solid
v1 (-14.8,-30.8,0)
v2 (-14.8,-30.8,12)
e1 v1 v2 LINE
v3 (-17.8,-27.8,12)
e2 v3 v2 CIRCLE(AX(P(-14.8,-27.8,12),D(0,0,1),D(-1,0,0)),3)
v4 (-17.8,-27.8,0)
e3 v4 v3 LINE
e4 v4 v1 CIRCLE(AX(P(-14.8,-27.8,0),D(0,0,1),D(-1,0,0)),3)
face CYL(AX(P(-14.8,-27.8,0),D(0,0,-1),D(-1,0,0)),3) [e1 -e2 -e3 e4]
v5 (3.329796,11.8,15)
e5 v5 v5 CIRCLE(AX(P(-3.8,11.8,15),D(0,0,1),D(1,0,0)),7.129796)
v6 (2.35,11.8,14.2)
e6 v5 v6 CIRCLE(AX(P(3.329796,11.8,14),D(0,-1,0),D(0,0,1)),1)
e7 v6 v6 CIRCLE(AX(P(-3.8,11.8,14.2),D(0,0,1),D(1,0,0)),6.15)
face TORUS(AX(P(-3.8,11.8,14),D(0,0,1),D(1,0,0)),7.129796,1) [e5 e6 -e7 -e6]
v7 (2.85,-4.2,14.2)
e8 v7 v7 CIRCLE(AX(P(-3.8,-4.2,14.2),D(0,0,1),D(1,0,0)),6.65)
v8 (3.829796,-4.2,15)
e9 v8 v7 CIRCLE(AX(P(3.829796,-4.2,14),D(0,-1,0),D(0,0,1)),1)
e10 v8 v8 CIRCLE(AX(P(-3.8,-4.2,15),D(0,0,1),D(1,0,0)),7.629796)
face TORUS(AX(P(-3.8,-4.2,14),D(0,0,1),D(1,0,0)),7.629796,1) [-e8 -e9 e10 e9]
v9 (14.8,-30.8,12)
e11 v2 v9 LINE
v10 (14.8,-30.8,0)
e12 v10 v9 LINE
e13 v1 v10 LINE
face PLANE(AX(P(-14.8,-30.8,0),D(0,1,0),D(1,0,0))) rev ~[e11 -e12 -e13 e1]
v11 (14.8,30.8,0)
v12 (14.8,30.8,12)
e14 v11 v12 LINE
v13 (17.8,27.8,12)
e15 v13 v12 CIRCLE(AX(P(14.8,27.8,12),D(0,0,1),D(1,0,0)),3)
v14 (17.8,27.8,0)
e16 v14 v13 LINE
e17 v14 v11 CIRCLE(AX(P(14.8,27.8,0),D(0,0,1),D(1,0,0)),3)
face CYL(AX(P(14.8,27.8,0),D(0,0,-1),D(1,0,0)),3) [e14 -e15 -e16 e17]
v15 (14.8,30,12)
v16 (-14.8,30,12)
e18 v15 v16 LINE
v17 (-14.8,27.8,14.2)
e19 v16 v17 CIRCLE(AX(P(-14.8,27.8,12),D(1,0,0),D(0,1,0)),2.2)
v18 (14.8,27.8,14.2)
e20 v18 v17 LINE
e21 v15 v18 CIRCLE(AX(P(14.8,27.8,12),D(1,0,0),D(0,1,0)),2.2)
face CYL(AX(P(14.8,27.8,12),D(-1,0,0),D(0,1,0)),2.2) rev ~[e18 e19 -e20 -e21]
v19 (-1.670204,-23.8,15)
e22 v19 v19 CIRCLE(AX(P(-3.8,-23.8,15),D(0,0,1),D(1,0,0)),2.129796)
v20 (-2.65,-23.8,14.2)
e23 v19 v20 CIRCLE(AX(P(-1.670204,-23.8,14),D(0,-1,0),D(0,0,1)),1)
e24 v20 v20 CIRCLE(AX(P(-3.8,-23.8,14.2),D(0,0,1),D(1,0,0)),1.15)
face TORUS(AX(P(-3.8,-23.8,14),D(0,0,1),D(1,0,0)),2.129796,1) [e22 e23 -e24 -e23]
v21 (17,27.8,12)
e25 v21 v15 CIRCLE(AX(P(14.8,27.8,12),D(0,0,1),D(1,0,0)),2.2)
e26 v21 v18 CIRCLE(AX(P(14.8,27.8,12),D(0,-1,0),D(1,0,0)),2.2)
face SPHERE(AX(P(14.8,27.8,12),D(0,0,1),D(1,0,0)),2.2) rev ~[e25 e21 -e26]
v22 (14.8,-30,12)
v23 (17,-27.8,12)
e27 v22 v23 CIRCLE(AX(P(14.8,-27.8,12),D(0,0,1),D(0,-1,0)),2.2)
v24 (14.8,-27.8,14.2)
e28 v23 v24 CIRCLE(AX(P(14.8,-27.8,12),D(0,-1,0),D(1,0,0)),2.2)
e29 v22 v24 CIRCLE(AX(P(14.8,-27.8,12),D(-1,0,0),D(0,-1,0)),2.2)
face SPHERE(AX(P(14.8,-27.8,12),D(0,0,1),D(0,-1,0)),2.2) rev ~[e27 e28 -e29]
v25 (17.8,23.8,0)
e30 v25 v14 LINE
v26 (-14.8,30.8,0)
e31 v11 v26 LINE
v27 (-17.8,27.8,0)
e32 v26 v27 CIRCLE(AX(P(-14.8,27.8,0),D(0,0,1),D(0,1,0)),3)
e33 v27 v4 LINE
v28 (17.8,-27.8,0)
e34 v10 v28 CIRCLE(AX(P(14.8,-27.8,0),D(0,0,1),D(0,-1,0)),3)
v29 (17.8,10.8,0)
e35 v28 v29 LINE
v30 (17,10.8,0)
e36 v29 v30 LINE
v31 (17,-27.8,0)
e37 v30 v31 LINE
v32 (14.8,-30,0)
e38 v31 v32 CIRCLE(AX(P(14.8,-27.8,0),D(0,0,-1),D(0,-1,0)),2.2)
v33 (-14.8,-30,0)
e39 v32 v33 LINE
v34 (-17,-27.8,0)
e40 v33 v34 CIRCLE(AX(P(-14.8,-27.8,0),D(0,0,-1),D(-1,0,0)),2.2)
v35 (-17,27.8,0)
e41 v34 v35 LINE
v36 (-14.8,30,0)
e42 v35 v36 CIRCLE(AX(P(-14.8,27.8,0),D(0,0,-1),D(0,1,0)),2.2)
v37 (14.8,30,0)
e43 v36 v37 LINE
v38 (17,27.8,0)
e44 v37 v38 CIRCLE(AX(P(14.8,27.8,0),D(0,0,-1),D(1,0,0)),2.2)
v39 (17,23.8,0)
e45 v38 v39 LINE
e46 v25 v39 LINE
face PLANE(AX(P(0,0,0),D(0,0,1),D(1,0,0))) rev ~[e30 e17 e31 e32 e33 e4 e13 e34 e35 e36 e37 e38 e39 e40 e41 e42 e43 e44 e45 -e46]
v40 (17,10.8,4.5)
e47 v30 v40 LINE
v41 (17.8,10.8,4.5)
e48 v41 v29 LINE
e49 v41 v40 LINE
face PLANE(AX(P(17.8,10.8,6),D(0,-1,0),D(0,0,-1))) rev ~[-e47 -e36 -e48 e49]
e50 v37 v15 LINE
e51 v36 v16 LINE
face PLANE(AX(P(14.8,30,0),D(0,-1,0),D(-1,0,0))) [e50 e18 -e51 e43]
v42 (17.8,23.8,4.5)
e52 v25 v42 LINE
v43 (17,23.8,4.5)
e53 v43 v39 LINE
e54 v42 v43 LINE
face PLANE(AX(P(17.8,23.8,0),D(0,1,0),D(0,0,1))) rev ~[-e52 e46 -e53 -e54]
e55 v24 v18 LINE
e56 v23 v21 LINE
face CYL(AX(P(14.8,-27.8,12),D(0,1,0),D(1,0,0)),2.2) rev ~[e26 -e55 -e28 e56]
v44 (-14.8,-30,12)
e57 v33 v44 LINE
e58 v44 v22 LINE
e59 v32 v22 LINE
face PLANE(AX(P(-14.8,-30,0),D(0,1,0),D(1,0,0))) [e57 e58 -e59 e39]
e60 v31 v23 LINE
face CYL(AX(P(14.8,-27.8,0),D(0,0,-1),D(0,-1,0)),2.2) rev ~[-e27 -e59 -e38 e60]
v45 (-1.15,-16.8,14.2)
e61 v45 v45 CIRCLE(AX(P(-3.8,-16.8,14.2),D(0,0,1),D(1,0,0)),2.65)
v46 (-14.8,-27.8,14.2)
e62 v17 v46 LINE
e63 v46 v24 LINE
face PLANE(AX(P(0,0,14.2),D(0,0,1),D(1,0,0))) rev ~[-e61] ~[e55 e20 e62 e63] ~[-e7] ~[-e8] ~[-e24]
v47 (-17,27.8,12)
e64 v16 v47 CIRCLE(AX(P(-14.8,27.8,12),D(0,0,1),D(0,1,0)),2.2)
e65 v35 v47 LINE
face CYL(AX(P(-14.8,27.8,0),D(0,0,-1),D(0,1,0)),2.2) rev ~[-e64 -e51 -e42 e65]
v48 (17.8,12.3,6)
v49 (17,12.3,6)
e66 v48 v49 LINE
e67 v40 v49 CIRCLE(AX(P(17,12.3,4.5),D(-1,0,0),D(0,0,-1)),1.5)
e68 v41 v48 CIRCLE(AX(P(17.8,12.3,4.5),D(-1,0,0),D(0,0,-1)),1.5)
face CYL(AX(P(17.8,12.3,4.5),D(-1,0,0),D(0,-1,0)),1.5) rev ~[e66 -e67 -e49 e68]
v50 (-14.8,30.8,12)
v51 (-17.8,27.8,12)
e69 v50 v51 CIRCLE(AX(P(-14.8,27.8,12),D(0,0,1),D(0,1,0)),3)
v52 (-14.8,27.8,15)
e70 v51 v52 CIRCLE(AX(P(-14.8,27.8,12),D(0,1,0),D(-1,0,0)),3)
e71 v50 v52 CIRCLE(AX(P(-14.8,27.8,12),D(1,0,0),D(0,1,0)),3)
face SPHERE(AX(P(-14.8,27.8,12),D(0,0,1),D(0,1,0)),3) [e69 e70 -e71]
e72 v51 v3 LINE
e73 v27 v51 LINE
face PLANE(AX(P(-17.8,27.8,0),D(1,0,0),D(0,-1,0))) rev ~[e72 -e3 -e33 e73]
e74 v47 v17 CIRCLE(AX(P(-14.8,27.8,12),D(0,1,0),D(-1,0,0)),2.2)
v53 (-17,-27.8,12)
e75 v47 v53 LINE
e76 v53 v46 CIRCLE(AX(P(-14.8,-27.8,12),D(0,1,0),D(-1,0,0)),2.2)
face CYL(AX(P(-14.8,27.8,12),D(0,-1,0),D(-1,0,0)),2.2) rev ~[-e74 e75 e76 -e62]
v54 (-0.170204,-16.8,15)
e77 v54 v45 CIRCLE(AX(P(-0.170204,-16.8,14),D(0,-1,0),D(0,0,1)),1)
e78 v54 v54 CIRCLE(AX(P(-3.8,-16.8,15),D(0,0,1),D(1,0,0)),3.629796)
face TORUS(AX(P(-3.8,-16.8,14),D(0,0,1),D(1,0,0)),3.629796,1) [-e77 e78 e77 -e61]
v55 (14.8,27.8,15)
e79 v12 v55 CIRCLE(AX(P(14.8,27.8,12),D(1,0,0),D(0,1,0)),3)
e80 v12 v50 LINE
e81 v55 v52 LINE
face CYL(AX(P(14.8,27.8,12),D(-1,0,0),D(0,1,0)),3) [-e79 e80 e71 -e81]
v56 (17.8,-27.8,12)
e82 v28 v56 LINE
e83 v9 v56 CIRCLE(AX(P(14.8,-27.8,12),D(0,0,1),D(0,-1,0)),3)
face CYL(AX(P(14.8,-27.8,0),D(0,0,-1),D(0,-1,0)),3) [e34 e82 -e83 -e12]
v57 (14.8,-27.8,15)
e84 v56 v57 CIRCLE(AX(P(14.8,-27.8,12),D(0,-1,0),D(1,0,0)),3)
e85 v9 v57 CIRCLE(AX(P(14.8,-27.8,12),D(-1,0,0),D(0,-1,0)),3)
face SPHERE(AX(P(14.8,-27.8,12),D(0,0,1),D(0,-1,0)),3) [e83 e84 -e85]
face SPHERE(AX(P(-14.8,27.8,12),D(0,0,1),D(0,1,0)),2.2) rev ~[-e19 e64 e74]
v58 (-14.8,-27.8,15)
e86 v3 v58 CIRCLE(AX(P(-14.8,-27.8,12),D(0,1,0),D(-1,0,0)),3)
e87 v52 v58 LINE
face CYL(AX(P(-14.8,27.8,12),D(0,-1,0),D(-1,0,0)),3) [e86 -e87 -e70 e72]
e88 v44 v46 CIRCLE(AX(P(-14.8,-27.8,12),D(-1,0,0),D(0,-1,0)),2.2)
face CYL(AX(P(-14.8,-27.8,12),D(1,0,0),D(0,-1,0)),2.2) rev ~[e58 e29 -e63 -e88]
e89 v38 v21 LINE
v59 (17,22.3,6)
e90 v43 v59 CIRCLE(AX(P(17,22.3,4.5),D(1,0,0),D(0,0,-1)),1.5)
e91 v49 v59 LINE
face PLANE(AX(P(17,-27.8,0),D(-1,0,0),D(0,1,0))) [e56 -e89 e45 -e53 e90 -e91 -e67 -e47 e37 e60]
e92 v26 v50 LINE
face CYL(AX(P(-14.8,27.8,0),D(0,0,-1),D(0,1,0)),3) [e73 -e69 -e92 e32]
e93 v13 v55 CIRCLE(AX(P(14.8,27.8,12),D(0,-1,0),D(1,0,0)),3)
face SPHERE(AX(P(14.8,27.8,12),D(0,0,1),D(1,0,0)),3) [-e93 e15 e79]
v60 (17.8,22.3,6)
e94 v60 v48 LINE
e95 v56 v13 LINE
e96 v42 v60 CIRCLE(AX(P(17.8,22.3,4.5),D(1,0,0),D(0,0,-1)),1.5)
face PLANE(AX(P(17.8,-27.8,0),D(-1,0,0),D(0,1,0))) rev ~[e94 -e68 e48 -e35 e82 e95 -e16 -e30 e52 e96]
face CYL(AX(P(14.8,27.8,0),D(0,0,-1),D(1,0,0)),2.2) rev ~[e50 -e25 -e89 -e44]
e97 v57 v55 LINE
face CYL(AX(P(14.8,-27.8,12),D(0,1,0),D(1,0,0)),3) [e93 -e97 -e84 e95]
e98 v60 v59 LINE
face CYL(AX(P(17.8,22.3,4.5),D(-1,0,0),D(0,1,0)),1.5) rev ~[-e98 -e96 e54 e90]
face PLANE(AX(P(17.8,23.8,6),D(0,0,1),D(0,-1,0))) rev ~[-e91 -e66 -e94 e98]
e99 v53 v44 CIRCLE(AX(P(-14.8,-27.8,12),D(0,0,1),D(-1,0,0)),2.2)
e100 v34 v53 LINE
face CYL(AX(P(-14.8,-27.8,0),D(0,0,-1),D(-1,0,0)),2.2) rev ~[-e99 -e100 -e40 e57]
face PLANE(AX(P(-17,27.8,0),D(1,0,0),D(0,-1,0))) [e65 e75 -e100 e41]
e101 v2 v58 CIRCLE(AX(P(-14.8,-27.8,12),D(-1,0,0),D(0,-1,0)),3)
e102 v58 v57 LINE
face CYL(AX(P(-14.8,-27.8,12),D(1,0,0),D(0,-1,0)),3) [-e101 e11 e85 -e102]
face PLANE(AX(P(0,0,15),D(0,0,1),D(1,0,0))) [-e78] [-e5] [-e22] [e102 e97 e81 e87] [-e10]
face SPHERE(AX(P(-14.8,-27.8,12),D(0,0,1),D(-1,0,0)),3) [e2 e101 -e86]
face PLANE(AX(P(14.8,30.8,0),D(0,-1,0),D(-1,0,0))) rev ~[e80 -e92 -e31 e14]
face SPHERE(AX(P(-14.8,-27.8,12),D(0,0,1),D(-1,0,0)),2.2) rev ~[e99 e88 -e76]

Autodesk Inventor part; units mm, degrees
ref_plane "YZ Plane" through (0, 0, 0) normal (1, 0, 0) x (0, 1, 0)
ref_plane "XZ Plane" through (0, 0, 0) normal (0, 1, 0) x (-1, 0, 0)
ref_plane "XY Plane" through (0, 0, 0) normal (0, 0, 1) x (1, 0, 0)
sketch "スケッチ1" plane through (0, 0, 0) normal (0, 0, 1) x (1, 0, 0)
  line L0 (17.8, -27.8) -> (17.8, 27.8) projected
  arc A0 (17.8, 27.8) -> (14.8, 30.8) centre (14.8, 27.8) ccw projected
  line L1 (14.8, 30.8) -> (-14.8, 30.8) projected
  arc A1 (-14.8, 30.8) -> (-17.8, 27.8) centre (-14.8, 27.8) ccw projected
  line L2 (-17.8, 27.8) -> (-17.8, -27.8) projected
  arc A2 (-17.8, -27.8) -> (-14.8, -30.8) centre (-14.8, -27.8) ccw projected
  line L3 (-14.8, -30.8) -> (14.8, -30.8) projected
  arc A3 (14.8, -30.8) -> (17.8, -27.8) centre (14.8, -27.8) ccw projected
  point P0 (0, 0)
extrude "押し出し1" add sketch "スケッチ1" along normal blind 15
fillet "フィレット1" radius 3 8 edges at (-16.9213, 29.9213, 15) (-17.8, 0, 15) (-16.9213, -29.9213, 15) (0, -30.8, 15) (16.9213, -29.9213, 15) (17.8, 0, 15) (16.9213, 29.9213, 15) (0, 30.8, 15)
shell "シェル1" thickness 0.8 removed faces 1 at (5.9333, 9.2667, 0)
sketch "スケッチ2" plane through (17.8, -27.8, 0) normal (1, 0, 0) x (0, 0, -1)
  line L0 (0, 51.6) -> (-6, 51.6)
  line L1 (-6, 51.6) -> (-6, 38.6)
  line L2 (-6, 38.6) -> (0, 38.6)
  line L3 (0, 38.6) -> (0, 51.6)
  line L4 (0, 58.6) -> (-12, 58.6) projected
  line L5 (0, 0) -> (0, 55.6) projected
  point P0 (0, 27.8)
  dimension "d4" = 6
  dimension "d5" = 7
  dimension "d6" = 20
extrude "押し出し2" cut sketch "スケッチ2" against normal blind 15
fillet "フィレット2" radius 1.5 2 edges at (17.4, 10.8, 6) (17.4, 23.8, 6)
sketch "スケッチ3" plane through (0, 0, 15) normal (0, 0, 1) x (1, 0, 0)
  line L0 (-17.8, 27.8) -> (-17.8, -27.8) projected
  line L1 (-14.8, -30.8) -> (14.8, -30.8) projected
  line L2 (17.8, -27.8) -> (17.8, 27.8) projected
  line L3 (14.8, 30.8) -> (-14.8, 30.8) projected
  circle A0 centre (-3.8, 11.8) radius 6.15
  circle A1 centre (-3.8, -16.8) radius 2.65
  circle A2 centre (-3.8, -4.2) radius 6.65
  circle A3 centre (-3.8, -23.8) radius 1.15
  point P0 (0, 0)
  dimension "d10" = 12.3
  dimension "d11" = 19
  dimension "d12" = 14
  dimension "d14" = 5.3
  dimension "d15" = 13.3
  dimension "d16" = 2.3
  dimension "d17" = 14
  dimension "d18" = 14
  dimension "d19" = 7
  dimension "d20" = 14
  dimension "d21" = 14
  dimension "d22" = 35
extrude "押し出し3" cut sketch "スケッチ3" against normal blind 15
fillet "フィレット3" radius 1 4 edges at (-4.95, -23.8, 15) (-6.45, -16.8, 15) (-10.45, -4.2, 15) (-9.95, 11.8, 15)
